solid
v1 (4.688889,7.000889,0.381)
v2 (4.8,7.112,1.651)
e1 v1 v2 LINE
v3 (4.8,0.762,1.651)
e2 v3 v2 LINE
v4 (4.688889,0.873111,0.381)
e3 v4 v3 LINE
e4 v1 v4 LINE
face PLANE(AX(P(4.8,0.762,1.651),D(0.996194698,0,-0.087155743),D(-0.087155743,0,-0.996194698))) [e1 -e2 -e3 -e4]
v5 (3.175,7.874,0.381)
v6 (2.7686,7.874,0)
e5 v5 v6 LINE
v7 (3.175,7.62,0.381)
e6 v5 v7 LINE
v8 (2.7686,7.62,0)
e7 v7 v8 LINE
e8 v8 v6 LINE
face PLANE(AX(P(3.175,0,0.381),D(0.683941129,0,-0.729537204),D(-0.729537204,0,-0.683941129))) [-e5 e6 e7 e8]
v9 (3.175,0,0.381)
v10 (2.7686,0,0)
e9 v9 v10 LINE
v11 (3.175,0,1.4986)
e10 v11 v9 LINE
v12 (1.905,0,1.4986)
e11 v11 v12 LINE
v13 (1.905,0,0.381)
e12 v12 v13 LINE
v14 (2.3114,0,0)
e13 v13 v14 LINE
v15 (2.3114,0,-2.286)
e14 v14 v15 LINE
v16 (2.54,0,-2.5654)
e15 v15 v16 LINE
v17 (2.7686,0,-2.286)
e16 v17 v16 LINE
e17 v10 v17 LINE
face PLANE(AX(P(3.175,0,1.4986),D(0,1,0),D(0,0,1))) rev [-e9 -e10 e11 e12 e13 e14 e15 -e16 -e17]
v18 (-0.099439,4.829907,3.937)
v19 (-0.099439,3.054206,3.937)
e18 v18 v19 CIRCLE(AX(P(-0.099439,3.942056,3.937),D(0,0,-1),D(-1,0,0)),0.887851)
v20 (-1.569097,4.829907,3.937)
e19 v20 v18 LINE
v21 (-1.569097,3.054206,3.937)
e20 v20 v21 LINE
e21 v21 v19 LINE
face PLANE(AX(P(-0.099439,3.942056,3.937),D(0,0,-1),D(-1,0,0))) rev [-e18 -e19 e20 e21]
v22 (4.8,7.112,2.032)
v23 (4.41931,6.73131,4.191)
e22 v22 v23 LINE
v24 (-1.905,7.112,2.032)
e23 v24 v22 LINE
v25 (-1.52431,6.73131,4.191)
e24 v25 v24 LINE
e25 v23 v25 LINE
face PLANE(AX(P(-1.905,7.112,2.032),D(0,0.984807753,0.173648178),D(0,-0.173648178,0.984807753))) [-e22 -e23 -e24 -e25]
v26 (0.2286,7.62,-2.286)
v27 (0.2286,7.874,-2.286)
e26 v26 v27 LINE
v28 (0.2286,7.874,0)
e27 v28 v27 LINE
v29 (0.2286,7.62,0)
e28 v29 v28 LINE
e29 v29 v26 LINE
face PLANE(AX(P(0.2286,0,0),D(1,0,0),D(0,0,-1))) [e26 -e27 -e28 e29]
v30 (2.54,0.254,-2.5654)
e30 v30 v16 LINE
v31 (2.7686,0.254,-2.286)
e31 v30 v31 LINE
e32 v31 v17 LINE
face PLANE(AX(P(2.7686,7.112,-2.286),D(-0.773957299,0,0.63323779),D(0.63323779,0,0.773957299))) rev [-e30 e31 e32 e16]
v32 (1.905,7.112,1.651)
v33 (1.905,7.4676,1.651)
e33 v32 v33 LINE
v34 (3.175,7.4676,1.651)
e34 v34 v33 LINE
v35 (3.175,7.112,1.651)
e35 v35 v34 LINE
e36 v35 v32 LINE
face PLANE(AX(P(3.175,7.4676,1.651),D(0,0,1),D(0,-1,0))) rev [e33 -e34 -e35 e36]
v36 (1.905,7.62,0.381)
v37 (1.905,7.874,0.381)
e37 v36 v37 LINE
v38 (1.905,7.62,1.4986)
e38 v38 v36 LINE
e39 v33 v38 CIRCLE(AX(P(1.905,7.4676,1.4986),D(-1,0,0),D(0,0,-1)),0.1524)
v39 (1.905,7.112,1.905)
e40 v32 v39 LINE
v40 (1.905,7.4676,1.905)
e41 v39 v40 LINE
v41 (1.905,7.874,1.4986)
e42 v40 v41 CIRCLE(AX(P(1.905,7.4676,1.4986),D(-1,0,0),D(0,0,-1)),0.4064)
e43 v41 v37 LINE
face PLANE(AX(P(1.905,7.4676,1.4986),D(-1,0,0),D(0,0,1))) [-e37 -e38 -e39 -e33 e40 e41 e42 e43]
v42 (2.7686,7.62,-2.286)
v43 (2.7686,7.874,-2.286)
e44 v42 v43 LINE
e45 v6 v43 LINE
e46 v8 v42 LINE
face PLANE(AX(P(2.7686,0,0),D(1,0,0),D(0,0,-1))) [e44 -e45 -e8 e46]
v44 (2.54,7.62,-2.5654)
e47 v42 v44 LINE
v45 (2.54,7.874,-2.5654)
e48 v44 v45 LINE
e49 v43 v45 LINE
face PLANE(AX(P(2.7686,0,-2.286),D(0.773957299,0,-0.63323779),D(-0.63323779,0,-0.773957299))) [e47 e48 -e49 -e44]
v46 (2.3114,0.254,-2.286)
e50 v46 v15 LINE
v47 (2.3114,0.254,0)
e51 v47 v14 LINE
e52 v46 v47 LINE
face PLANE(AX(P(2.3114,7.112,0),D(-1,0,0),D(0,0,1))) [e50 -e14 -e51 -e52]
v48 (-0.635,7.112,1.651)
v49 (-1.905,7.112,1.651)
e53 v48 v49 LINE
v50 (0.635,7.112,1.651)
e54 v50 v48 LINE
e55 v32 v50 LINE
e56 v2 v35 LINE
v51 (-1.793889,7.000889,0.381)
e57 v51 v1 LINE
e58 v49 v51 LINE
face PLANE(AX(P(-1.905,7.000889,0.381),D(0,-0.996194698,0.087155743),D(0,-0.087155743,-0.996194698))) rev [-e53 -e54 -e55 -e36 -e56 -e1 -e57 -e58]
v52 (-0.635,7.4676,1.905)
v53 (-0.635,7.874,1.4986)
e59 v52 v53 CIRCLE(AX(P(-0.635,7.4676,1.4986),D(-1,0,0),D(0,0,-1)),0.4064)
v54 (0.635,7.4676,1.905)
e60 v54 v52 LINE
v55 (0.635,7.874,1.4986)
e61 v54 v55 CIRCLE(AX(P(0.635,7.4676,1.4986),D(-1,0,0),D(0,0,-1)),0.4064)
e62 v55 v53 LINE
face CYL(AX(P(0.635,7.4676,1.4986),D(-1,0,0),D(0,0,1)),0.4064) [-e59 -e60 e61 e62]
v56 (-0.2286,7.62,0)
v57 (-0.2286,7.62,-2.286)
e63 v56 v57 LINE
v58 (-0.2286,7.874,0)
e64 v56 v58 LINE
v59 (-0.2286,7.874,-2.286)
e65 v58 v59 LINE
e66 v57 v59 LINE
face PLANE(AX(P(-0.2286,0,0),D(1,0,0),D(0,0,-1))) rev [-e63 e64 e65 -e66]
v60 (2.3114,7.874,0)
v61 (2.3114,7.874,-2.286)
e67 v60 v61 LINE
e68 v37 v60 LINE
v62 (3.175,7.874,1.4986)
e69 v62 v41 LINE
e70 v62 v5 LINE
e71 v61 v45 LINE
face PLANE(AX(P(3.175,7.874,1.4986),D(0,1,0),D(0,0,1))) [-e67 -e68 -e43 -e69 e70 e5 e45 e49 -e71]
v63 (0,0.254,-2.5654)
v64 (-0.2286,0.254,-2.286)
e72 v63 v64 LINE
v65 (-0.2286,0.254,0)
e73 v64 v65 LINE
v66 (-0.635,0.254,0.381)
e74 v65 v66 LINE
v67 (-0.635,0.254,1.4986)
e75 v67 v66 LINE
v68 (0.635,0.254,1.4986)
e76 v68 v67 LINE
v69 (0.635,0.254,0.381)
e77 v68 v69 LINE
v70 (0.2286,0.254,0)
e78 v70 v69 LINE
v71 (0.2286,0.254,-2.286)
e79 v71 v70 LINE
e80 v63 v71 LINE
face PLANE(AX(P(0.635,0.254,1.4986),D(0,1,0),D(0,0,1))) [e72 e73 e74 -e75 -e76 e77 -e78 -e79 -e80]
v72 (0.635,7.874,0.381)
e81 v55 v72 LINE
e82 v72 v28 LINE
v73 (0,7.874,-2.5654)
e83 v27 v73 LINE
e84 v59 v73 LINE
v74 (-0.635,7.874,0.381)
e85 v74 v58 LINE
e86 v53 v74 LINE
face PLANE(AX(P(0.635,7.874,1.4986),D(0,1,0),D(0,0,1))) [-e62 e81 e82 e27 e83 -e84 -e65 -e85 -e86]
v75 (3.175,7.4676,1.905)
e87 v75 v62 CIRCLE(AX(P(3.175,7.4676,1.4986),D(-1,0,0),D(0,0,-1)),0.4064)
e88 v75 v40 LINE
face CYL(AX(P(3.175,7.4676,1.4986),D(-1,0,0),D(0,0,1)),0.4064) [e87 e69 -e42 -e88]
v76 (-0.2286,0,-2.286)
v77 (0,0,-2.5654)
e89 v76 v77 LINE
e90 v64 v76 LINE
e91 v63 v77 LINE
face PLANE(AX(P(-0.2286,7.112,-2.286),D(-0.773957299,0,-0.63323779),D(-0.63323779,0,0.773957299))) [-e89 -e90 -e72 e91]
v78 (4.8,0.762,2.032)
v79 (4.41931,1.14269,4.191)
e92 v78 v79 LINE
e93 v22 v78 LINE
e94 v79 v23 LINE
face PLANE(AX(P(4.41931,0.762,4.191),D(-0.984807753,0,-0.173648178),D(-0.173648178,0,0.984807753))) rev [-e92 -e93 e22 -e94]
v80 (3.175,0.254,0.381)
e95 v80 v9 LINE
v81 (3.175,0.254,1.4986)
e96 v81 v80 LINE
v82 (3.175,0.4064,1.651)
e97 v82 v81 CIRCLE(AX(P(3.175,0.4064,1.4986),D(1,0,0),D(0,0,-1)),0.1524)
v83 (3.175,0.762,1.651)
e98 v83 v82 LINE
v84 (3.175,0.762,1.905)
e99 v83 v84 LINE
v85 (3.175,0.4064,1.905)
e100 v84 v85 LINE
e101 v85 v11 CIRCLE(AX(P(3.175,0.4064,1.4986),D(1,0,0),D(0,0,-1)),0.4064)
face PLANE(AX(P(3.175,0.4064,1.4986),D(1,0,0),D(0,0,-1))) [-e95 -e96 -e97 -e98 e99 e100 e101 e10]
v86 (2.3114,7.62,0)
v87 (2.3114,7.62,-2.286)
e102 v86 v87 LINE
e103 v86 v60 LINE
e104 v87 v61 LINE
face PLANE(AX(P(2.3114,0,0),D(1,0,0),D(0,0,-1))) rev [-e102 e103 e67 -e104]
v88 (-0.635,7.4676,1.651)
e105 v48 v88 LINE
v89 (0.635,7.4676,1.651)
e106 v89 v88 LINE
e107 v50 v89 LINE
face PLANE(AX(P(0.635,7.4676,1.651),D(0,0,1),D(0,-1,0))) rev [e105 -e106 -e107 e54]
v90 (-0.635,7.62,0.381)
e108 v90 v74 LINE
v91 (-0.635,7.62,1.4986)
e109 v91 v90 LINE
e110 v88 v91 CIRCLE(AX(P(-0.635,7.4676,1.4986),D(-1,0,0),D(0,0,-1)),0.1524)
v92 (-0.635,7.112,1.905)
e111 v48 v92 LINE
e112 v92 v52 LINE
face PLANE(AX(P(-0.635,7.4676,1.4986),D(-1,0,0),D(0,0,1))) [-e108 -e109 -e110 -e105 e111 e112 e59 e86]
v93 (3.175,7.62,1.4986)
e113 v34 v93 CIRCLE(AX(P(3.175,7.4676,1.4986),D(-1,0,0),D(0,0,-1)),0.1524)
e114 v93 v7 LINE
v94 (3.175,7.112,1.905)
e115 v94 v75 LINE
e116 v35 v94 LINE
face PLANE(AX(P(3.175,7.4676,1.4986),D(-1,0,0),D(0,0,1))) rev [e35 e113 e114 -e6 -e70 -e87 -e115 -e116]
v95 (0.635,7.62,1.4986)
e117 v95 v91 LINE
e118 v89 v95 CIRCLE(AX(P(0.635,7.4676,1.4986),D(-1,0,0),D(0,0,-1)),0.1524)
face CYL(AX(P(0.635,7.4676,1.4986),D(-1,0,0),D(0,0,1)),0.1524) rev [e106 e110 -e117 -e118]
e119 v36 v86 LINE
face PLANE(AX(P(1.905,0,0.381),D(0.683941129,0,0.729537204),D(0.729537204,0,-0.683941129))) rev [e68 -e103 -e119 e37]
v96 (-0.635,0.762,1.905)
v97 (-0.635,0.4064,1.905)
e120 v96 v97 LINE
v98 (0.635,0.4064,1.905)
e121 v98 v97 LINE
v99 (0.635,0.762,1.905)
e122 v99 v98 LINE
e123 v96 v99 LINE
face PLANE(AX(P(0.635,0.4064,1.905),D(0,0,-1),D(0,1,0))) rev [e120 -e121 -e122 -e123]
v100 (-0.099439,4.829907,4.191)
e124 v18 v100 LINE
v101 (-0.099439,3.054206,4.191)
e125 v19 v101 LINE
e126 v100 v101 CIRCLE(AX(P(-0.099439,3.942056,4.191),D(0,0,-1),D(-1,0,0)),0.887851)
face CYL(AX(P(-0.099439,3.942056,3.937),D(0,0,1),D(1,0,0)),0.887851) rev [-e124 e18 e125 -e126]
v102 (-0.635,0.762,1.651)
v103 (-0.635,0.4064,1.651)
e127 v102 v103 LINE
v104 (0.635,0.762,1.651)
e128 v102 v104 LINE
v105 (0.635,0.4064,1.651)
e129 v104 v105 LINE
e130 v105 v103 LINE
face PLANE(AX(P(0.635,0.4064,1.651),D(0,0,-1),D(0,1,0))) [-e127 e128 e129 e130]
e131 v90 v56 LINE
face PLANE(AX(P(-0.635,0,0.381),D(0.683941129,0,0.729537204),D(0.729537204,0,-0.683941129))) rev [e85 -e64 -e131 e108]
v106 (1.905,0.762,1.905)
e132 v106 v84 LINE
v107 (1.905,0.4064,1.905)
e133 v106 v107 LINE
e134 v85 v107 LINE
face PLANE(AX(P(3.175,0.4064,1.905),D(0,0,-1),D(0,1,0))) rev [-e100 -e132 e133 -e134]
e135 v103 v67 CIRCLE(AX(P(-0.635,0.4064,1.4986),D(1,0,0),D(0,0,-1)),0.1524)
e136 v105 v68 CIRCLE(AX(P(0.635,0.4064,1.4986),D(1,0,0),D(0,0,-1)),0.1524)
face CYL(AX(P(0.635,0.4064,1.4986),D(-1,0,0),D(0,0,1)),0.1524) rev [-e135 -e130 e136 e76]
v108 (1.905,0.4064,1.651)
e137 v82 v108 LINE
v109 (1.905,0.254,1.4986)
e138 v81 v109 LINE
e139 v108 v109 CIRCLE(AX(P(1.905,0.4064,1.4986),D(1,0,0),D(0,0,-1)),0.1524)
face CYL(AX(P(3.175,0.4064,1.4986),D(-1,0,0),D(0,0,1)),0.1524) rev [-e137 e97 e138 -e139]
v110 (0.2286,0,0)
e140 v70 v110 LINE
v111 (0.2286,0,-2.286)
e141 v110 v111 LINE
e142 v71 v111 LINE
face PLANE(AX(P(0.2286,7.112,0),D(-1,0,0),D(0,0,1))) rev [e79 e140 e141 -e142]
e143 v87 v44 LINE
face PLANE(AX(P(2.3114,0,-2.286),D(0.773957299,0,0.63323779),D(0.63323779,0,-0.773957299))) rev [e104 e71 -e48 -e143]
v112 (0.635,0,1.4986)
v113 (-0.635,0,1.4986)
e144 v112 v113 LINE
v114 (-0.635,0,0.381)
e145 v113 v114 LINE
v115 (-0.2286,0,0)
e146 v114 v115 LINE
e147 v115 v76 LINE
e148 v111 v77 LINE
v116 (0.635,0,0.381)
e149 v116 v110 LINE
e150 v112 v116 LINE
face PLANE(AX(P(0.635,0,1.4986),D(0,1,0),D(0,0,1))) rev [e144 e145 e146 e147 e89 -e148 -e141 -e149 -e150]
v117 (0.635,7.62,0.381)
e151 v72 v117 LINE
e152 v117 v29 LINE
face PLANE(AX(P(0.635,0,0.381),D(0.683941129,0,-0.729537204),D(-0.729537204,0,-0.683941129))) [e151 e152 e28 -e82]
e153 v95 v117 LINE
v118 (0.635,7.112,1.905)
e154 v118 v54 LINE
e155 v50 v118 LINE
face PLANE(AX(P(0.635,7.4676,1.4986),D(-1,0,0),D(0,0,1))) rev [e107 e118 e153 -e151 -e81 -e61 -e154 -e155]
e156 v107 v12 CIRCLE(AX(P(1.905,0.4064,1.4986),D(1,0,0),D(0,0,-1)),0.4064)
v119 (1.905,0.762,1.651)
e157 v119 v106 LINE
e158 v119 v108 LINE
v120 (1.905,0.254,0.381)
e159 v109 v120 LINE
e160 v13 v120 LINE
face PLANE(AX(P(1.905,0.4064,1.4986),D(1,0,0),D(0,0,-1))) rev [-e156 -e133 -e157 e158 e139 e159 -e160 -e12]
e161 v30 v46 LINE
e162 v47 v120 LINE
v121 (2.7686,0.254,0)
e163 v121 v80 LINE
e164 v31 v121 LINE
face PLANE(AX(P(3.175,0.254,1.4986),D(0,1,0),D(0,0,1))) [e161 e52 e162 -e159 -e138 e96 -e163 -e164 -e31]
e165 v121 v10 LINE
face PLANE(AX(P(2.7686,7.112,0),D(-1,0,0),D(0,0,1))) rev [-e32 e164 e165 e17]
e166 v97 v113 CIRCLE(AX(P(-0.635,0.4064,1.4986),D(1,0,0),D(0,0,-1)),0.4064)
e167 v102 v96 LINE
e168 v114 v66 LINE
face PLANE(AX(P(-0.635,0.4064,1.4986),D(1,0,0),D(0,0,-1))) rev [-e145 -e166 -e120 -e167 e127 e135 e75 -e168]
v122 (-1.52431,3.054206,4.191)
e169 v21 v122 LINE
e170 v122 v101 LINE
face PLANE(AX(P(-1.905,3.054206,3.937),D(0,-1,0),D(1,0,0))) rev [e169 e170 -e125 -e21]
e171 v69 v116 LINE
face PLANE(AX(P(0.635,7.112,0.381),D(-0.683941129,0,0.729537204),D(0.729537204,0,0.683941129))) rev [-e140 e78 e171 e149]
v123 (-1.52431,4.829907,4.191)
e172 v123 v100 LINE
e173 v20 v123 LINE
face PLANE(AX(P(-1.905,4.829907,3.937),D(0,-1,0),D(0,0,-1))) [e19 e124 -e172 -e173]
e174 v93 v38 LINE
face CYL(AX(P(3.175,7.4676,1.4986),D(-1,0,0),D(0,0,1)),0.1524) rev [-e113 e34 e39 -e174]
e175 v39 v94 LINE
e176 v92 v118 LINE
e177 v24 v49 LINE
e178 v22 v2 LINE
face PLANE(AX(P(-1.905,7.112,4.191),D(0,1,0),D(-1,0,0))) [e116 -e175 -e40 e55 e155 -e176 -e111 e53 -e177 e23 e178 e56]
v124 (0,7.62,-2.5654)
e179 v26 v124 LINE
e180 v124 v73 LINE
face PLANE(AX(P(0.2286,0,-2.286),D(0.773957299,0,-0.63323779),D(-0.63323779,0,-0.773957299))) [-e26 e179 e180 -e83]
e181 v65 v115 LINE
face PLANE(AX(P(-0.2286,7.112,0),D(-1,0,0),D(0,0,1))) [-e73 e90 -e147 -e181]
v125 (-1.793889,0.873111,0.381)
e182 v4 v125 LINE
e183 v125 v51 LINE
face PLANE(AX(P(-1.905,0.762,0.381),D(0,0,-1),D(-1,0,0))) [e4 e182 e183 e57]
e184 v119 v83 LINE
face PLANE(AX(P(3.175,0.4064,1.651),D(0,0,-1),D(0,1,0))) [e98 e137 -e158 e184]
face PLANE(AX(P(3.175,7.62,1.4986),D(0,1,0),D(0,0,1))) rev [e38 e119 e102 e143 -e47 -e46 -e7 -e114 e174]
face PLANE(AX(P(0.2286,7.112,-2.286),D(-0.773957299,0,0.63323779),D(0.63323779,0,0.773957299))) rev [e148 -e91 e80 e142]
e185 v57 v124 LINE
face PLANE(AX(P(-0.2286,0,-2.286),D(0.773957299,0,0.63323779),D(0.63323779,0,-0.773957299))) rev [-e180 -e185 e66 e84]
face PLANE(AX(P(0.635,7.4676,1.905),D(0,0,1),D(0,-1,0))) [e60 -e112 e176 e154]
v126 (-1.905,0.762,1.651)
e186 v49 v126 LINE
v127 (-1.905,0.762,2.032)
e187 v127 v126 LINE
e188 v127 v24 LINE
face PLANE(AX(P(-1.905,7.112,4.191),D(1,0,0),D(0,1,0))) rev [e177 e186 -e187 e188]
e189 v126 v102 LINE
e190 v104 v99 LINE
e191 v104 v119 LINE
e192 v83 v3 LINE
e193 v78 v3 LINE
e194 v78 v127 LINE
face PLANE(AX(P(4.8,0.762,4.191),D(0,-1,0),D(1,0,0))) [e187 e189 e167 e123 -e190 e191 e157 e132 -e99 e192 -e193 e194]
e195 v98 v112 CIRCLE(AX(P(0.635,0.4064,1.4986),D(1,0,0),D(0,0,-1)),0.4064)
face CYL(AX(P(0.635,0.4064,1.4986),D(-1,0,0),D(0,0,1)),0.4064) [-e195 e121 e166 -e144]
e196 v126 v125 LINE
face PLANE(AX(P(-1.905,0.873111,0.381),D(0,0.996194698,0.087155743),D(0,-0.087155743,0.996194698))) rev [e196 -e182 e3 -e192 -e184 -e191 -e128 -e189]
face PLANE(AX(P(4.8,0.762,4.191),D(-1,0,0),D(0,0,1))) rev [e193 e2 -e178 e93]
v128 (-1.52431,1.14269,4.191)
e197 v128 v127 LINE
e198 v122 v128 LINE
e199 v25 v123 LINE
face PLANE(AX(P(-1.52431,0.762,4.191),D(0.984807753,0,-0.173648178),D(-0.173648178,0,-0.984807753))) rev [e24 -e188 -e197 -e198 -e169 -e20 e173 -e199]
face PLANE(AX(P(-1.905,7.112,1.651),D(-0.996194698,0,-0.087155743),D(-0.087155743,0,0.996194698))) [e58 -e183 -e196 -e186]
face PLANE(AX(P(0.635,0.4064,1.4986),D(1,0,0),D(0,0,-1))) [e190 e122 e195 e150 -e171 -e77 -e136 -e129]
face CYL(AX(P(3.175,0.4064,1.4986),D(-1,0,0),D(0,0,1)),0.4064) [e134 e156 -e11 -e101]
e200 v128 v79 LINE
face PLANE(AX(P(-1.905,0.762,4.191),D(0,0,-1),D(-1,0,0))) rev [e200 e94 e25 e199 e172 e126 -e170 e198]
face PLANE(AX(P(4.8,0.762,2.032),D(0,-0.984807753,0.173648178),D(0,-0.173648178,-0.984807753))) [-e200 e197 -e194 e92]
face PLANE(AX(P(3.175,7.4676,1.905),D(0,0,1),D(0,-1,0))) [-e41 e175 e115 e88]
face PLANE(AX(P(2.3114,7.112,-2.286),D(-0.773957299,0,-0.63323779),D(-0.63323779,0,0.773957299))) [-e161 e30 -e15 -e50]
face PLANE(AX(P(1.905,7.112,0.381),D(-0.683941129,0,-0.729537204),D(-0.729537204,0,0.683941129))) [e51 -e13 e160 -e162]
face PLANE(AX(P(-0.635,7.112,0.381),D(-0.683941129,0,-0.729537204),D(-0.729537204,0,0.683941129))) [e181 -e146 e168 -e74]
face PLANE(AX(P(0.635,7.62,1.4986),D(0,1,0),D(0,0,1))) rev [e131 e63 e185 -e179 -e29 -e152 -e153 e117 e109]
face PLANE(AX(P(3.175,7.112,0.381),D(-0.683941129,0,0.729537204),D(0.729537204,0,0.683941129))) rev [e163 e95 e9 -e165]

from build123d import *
from OCP.BRepFilletAPI import BRepFilletAPI_MakeChamfer

# Parameters (mm, degrees)
SKETCH1_W                = 6.705
SKETCH1_H                = 6.35
BASE_EXTRUDE_DEPTH       = 3.81
CHAMFER1_SIZE            = 2.159
CHAMFER1_SIZE2           = 0.380689951
CHAMFER2_SIZE            = 1.27
CHAMFER2_SIZE2           = 0.111110603
CUT_EXTRUDE1_START       = 3.937
CUT_EXTRUDE1_DEPTH       = 0.254
BOSS_EXTRUDE_THIN3_DEPTH = 0.635
CUT_EXTRUDE3_DEPTH       = 10.549085035
CUT_EXTRUDE4_DEPTH       = 10.549085035
LPATTERN2_COUNT          = 2
LPATTERN2_PITCH          = 2.54
MIRROR1_COPY_1_DEPTH     = 0.635
MIRROR1_COPY_2_DEPTH     = 10.549085035
MIRROR1_COPY_3_DEPTH     = 10.549085035


# Read off the part's stored shape, not the designer's step: Cut-Extrude1
with BuildPart() as part:
    # Sketch1 → Base-Extrude (new body)
    with BuildSketch(Plane.XY.offset(0.381)):
        with Locations((1.4475, 3.937)):
            Rectangle(SKETCH1_W, SKETCH1_H)
    extrude(amount=BASE_EXTRUDE_DEPTH)

    # Chamfer1: one chamfer whose edges measure the first distance from different faces: ONE call of the kernel's chamfer builder (chamfer() names one face for all edges)
    chamfer1_edges_1 = [part.edges().sort_by_distance(p)[0] for p in [
        (4.8, 3.937, 4.191),
    ]]
    chamfer1_side_1 = [part.faces().sort_by_distance(p)[0] for p in [
        (4.8, 3.937, 2.286),
    ]]
    chamfer1_edges_2 = [part.edges().sort_by_distance(p)[0] for p in [
        (1.4475, 7.112, 4.191),
    ]]
    chamfer1_side_2 = [part.faces().sort_by_distance(p)[0] for p in [
        (1.4475, 7.112, 2.286),
    ]]
    chamfer1_edges_3 = [part.edges().sort_by_distance(p)[0] for p in [
        (-1.905, 3.937, 4.191),
    ]]
    chamfer1_side_3 = [part.faces().sort_by_distance(p)[0] for p in [
        (-1.905, 3.937, 2.286),
    ]]
    chamfer1_edges_4 = [part.edges().sort_by_distance(p)[0] for p in [
        (1.4475, 0.762, 4.191),
    ]]
    chamfer1_side_4 = [part.faces().sort_by_distance(p)[0] for p in [
        (1.4475, 0.762, 2.286),
    ]]
    chamfer1 = BRepFilletAPI_MakeChamfer(part.part.solid().wrapped)
    for e in chamfer1_edges_1:
        chamfer1.Add(CHAMFER1_SIZE, CHAMFER1_SIZE2, e.wrapped, chamfer1_side_1[0].wrapped)  # the first distance lies on this face
    for e in chamfer1_edges_2:
        chamfer1.Add(CHAMFER1_SIZE, CHAMFER1_SIZE2, e.wrapped, chamfer1_side_2[0].wrapped)  # the first distance lies on this face
    for e in chamfer1_edges_3:
        chamfer1.Add(CHAMFER1_SIZE, CHAMFER1_SIZE2, e.wrapped, chamfer1_side_3[0].wrapped)  # the first distance lies on this face
    for e in chamfer1_edges_4:
        chamfer1.Add(CHAMFER1_SIZE, CHAMFER1_SIZE2, e.wrapped, chamfer1_side_4[0].wrapped)  # the first distance lies on this face
    add(Compound.cast(chamfer1.Shape()), mode=Mode.REPLACE)

    # Chamfer2: one chamfer whose edges measure the first distance from different faces: ONE call of the kernel's chamfer builder (chamfer() names one face for all edges)
    chamfer2_edges_1 = [part.edges().sort_by_distance(p)[0] for p in [
        (1.4475, 7.112, 0.381),
    ]]
    chamfer2_side_1 = [part.faces().sort_by_distance(p)[0] for p in [
        (1.4475, 7.112, 1.2065),
    ]]
    chamfer2_edges_2 = [part.edges().sort_by_distance(p)[0] for p in [
        (4.8, 3.937, 0.381),
    ]]
    chamfer2_side_2 = [part.faces().sort_by_distance(p)[0] for p in [
        (4.8, 3.937, 1.2065),
    ]]
    chamfer2_edges_3 = [part.edges().sort_by_distance(p)[0] for p in [
        (1.4475, 0.762, 0.381),
    ]]
    chamfer2_side_3 = [part.faces().sort_by_distance(p)[0] for p in [
        (1.4475, 0.762, 1.2065),
    ]]
    chamfer2_edges_4 = [part.edges().sort_by_distance(p)[0] for p in [
        (-1.905, 3.937, 0.381),
    ]]
    chamfer2_side_4 = [part.faces().sort_by_distance(p)[0] for p in [
        (-1.905, 3.937, 1.2065),
    ]]
    chamfer2 = BRepFilletAPI_MakeChamfer(part.part.solid().wrapped)
    for e in chamfer2_edges_1:
        chamfer2.Add(CHAMFER2_SIZE, CHAMFER2_SIZE2, e.wrapped, chamfer2_side_1[0].wrapped)  # the first distance lies on this face
    for e in chamfer2_edges_2:
        chamfer2.Add(CHAMFER2_SIZE, CHAMFER2_SIZE2, e.wrapped, chamfer2_side_2[0].wrapped)  # the first distance lies on this face
    for e in chamfer2_edges_3:
        chamfer2.Add(CHAMFER2_SIZE, CHAMFER2_SIZE2, e.wrapped, chamfer2_side_3[0].wrapped)  # the first distance lies on this face
    for e in chamfer2_edges_4:
        chamfer2.Add(CHAMFER2_SIZE, CHAMFER2_SIZE2, e.wrapped, chamfer2_side_4[0].wrapped)  # the first distance lies on this face
    add(Compound.cast(chamfer2.Shape()), mode=Mode.REPLACE)

    # Cut-Extrude1 outline → Cut-Extrude1 (cut)
    with BuildSketch(Plane.XY.offset(CUT_EXTRUDE1_START)):
        with BuildLine():
            Line((-0.099439262, 4.829907029), (-3, 4.829907029))
            Line((-3, 4.829907029), (-3, 3.054205915))
            Line((-3, 3.054205915), (-0.099439262, 3.054205915))
            ThreePointArc((-0.099439262, 3.054205915), (0.788411294, 3.942056472), (-0.099439262, 4.829907029))
        make_face()
    extrude(amount=CUT_EXTRUDE1_DEPTH, mode=Mode.SUBTRACT)

    # Sketch4 → Boss-Extrude-Thin3 (add, symmetric)
    with BuildSketch(Plane(origin=(0, 0, 0), x_dir=(0, 0, -1), z_dir=(1, 0, 0))):
        with BuildLine():
            Line((2.5654, 0), (-1.4986, 0))
            ThreePointArc((-1.4986, 0), (-1.785968196, 0.119031804), (-1.905, 0.4064))
            Line((-1.905, 0.4064), (-1.905, 1.120296425))
            Line((-1.905, 1.120296425), (-1.651, 1.120296425))
            Line((-1.651, 1.120296425), (-1.651, 0.4064))
            ThreePointArc((-1.651, 0.4064), (-1.606363073, 0.298636927), (-1.4986, 0.254))
            Line((-1.4986, 0.254), (2.5654, 0.254))
            Line((2.5654, 0.254), (2.5654, 0))
        make_face()
    boss_extrude_thin3 = extrude(amount=BOSS_EXTRUDE_THIN3_DEPTH, both=True)

    # Sketch8 → Cut-Extrude3 (cut, through all)
    with BuildSketch(Plane.XZ):
        Polygon((-0.635, 0.381), (-0.2286, 0), (-0.2286, -2.286), (0, -2.5654), (-0.635, -2.5654), align=None)
    cut_extrude3 = extrude(amount=-CUT_EXTRUDE3_DEPTH, mode=Mode.SUBTRACT)

    # Sketch9 → Cut-Extrude4 (cut, through all)
    with BuildSketch(Plane.XZ):
        Polygon((0.635, 0.381), (0.2286, 0), (0.2286, -2.286), (0, -2.5654), (0.635, -2.5654), align=None)
    cut_extrude4 = extrude(amount=-CUT_EXTRUDE4_DEPTH, mode=Mode.SUBTRACT)

    # LPattern2: Boss-Extrude-Thin3, Cut-Extrude3, Cut-Extrude4 ×2
    with Locations(*[(i * LPATTERN2_PITCH, 0, 0) for i in range(1, LPATTERN2_COUNT)]):
        add(boss_extrude_thin3)
        add(cut_extrude3, mode=Mode.SUBTRACT)
        add(cut_extrude4, mode=Mode.SUBTRACT)

    # Mirror1: Boss-Extrude-Thin3, Cut-Extrude3, Cut-Extrude4 across plane
    add(boss_extrude_thin3.mirror(Plane.ZX.offset(3.937)))
    add(cut_extrude3.mirror(Plane.ZX.offset(3.937)), mode=Mode.SUBTRACT)
    add(cut_extrude4.mirror(Plane.ZX.offset(3.937)), mode=Mode.SUBTRACT)

    # Mirror1 copy 1 sketch → Mirror1 copy 1 (add, symmetric)
    with BuildSketch(Plane(origin=(2.54, 7.874, 0), x_dir=(0, 0, -1), z_dir=(1, 0, 0))):
        with BuildLine():
            Line((2.5654, 0), (-1.4986, 0))
            ThreePointArc((-1.4986, 0), (-1.785968196, -0.119031804), (-1.905, -0.4064))
            Line((-1.905, -0.4064), (-1.905, -1.120296425))
            Line((-1.905, -1.120296425), (-1.651, -1.120296425))
            Line((-1.651, -1.120296425), (-1.651, -0.4064))
            ThreePointArc((-1.651, -0.4064), (-1.606363073, -0.298636927), (-1.4986, -0.254))
            Line((-1.4986, -0.254), (2.5654, -0.254))
            Line((2.5654, -0.254), (2.5654, 0))
        make_face()
    extrude(amount=MIRROR1_COPY_1_DEPTH, both=True)

    # Mirror1 copy 2 sketch → Mirror1 copy 2 (cut, through all)
    with BuildSketch(Plane(origin=(2.54, 7.874, 0), x_dir=(1, 0, 0), z_dir=(0, 1, 0))):
        Polygon((-0.635, -0.381), (-0.2286, 0), (-0.2286, 2.286), (0, 2.5654), (-0.635, 2.5654), align=None)
    extrude(amount=-MIRROR1_COPY_2_DEPTH, mode=Mode.SUBTRACT)

    # Mirror1 copy 3 sketch → Mirror1 copy 3 (cut, through all)
    with BuildSketch(Plane(origin=(2.54, 7.874, 0), x_dir=(1, 0, 0), z_dir=(0, 1, 0))):
        Polygon((0.635, -0.381), (0.2286, 0), (0.2286, 2.286), (0, 2.5654), (0.635, 2.5654), align=None)
    extrude(amount=-MIRROR1_COPY_3_DEPTH, mode=Mode.SUBTRACT)


solid = part.part
